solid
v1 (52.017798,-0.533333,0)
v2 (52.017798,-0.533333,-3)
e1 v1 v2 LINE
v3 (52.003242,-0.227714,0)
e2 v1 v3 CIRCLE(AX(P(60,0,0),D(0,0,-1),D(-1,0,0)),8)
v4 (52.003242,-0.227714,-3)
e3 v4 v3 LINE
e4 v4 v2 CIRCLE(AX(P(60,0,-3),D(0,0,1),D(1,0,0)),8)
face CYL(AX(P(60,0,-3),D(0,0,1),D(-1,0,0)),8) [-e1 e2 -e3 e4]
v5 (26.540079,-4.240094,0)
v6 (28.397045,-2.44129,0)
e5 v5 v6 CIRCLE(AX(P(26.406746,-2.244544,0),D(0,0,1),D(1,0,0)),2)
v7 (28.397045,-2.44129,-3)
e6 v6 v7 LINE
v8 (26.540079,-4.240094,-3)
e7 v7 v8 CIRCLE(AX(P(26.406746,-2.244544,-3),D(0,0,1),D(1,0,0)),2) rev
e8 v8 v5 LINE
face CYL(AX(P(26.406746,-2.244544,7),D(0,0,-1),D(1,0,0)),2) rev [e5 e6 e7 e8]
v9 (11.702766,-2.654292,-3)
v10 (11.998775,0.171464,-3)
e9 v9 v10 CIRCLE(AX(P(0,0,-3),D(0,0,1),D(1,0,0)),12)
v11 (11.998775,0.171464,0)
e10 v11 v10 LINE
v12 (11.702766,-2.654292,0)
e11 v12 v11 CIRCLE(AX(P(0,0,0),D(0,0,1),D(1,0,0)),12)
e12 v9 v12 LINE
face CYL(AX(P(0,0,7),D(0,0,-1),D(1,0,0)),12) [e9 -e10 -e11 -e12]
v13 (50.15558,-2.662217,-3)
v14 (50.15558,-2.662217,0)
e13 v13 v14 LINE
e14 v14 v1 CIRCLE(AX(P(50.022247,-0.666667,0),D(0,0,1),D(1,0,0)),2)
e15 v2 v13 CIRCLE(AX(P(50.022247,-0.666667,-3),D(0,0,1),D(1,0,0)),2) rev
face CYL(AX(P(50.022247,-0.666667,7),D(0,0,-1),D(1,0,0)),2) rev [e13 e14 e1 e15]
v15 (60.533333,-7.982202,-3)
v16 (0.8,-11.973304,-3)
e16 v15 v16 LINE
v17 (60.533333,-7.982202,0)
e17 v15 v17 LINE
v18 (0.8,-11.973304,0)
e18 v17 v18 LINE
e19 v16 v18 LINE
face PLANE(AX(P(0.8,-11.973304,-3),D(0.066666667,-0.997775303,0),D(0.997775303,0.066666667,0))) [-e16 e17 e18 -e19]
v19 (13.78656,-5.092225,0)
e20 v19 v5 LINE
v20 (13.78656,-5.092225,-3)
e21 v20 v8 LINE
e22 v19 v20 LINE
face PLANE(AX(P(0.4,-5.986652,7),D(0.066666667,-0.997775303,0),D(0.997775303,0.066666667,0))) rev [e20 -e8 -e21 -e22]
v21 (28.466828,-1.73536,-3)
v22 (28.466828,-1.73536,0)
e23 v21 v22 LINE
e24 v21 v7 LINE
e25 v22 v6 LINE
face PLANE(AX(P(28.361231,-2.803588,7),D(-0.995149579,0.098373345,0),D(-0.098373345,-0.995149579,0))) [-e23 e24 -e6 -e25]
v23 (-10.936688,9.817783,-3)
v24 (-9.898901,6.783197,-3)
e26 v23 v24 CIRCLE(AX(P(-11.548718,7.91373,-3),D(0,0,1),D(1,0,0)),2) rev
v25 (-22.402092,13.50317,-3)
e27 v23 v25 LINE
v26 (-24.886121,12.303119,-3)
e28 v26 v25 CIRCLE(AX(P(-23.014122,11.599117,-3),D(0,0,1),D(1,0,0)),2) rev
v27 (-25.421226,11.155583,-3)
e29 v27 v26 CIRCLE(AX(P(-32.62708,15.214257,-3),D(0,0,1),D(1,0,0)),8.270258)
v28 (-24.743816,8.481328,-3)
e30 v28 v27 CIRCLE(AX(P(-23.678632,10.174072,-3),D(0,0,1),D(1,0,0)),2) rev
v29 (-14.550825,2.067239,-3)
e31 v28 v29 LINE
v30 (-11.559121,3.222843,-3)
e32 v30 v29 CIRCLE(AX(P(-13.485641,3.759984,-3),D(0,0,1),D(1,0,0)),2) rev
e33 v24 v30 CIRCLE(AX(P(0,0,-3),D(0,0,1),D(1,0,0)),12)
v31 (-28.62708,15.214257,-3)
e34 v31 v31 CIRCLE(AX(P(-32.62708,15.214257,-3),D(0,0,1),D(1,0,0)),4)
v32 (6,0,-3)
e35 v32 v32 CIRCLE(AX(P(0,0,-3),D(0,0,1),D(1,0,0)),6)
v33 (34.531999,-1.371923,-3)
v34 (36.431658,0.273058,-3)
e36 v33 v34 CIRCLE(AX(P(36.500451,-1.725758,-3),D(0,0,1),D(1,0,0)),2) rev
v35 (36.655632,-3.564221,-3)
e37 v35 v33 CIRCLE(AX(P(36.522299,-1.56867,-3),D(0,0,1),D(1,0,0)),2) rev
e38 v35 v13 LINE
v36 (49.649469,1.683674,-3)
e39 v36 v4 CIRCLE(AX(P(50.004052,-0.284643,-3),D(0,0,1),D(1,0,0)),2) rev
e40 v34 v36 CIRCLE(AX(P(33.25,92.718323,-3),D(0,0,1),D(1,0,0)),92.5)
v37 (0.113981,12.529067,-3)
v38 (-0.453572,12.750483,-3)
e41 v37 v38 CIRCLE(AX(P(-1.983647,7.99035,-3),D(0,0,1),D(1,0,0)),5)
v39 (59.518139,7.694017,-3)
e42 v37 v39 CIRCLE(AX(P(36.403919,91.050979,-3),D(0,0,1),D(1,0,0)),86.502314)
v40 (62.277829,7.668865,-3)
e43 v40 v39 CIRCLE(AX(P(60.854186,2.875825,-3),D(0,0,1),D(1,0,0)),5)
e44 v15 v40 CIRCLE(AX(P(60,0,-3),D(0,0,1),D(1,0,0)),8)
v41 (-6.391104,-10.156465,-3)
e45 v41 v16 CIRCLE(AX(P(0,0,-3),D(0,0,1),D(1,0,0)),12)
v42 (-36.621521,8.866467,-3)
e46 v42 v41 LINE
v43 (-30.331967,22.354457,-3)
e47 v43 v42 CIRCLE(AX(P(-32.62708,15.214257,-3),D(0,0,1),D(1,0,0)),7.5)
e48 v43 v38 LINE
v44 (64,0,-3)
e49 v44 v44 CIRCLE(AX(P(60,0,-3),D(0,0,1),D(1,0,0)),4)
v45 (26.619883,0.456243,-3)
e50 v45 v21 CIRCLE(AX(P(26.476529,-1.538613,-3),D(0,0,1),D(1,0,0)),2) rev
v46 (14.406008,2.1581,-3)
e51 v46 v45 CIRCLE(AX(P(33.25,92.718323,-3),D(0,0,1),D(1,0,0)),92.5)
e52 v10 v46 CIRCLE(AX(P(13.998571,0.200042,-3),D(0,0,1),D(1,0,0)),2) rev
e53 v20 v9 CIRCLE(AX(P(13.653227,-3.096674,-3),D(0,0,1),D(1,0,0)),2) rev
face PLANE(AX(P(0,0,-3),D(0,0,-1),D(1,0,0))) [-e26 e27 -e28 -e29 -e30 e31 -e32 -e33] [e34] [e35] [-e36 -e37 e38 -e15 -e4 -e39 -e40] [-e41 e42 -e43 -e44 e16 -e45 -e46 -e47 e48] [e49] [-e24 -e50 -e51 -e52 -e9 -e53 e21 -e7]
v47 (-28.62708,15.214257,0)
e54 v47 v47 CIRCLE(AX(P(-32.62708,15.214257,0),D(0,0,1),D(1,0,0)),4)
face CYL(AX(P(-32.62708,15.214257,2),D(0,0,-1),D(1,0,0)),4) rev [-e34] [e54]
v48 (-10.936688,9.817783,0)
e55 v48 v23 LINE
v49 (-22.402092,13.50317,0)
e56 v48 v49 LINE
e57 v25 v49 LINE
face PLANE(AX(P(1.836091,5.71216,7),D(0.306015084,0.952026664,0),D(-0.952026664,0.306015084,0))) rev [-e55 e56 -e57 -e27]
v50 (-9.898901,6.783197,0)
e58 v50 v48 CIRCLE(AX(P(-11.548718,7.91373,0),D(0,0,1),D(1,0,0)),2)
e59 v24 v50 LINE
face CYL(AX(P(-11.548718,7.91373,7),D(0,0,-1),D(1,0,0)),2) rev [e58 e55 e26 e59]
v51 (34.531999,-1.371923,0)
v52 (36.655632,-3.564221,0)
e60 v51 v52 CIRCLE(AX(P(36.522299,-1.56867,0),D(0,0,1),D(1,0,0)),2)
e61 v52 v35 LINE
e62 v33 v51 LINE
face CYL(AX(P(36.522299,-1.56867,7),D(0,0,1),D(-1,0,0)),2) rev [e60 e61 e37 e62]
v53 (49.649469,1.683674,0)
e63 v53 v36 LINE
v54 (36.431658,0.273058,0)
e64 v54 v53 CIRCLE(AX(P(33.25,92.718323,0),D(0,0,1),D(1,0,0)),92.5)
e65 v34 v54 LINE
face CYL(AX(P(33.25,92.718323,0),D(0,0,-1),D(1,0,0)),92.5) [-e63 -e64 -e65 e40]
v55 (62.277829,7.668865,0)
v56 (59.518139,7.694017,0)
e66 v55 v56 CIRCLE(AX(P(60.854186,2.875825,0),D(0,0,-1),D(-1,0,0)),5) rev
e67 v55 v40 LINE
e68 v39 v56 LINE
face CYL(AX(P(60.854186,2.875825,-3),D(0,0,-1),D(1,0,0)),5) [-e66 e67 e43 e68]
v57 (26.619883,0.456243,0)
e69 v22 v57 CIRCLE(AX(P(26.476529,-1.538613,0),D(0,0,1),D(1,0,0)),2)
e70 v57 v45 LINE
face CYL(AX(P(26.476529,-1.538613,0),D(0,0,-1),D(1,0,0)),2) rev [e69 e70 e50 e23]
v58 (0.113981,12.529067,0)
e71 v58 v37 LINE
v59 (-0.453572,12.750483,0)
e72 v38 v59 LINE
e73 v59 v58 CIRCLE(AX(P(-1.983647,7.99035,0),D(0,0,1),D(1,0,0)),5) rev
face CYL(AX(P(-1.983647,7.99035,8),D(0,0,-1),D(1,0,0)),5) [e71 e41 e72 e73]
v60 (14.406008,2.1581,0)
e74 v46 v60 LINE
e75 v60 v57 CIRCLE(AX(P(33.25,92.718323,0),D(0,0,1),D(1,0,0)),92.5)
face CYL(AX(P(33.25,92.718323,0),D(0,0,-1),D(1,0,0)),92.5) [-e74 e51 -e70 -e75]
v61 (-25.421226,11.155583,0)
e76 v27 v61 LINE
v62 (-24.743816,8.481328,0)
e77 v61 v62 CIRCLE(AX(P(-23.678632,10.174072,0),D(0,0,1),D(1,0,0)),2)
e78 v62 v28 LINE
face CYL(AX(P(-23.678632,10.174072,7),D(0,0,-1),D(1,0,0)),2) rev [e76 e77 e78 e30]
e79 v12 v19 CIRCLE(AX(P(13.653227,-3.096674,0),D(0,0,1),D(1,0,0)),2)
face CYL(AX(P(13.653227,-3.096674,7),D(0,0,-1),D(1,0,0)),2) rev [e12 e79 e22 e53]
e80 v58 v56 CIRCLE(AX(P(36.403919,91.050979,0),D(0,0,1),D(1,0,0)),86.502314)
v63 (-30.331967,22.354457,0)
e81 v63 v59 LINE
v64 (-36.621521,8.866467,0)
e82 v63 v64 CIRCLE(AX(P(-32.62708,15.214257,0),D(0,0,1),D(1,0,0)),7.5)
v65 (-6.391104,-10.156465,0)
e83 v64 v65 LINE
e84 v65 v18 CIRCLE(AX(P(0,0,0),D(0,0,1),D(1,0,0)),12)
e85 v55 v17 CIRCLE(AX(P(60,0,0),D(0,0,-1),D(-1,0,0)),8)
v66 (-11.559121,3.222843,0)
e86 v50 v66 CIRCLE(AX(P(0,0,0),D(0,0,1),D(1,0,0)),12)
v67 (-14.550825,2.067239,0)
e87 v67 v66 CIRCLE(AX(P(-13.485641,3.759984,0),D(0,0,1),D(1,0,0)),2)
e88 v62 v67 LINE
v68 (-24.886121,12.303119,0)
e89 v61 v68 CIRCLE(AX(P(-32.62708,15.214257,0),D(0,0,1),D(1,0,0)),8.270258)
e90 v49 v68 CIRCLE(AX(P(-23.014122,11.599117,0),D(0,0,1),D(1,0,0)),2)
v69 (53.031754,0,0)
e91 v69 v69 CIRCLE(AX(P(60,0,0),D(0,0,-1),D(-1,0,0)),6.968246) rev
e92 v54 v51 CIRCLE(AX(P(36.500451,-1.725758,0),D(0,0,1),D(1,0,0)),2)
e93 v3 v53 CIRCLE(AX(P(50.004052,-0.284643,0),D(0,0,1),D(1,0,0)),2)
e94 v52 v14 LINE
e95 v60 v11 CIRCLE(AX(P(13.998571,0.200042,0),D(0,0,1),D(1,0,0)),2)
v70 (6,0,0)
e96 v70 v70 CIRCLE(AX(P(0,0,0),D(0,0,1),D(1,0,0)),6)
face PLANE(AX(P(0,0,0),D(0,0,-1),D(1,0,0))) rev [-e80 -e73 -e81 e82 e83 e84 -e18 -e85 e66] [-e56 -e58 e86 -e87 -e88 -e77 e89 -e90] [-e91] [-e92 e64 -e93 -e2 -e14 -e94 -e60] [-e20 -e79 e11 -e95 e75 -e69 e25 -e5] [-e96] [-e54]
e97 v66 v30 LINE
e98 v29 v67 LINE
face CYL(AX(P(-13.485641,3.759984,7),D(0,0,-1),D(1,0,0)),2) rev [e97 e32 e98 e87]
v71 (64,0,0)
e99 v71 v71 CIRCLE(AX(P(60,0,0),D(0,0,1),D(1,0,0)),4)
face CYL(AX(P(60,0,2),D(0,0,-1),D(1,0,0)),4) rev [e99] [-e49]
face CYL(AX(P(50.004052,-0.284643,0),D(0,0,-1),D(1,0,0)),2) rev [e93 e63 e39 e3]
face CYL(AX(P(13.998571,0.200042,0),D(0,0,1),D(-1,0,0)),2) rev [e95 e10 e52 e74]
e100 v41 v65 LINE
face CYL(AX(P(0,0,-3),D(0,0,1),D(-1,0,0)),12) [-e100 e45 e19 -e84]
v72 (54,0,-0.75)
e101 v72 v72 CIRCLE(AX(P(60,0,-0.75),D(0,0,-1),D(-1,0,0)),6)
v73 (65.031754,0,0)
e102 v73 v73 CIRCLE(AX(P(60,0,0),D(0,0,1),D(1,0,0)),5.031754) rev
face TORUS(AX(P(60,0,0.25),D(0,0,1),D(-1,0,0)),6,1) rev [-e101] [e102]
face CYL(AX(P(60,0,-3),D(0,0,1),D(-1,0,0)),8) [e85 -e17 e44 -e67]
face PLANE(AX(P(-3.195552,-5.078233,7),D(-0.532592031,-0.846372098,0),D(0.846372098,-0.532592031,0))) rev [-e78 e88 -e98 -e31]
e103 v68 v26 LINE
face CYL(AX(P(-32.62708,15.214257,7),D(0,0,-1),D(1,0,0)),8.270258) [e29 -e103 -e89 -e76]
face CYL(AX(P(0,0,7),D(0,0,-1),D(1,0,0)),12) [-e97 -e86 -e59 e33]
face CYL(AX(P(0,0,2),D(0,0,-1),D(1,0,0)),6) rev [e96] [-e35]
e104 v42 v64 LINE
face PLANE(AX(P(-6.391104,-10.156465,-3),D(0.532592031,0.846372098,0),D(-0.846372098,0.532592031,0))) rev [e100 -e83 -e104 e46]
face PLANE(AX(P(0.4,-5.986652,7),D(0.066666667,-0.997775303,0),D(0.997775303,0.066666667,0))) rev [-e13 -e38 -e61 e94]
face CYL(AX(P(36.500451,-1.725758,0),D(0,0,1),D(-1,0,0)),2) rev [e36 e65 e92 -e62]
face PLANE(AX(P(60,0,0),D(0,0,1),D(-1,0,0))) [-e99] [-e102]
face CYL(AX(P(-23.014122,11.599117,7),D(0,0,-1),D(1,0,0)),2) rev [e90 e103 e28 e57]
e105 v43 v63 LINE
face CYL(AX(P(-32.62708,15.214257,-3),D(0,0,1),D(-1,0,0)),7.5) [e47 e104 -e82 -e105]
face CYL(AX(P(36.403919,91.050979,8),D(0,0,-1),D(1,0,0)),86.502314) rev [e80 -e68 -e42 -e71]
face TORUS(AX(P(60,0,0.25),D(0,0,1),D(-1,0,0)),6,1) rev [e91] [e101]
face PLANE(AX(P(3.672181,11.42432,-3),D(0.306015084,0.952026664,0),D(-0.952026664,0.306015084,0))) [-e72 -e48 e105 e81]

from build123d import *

# Parameters (mm, degrees)
EXTRUDE_1_DEPTH     = 3
SKETCH_2_R          = 4
SKETCH_2_R_2        = 6
CUT_EXTRUDE_1_DEPTH = 5
CUT_EXTRUDE_START   = -10
CUT_EXTRUDE_2_DEPTH = 10
FILLET_1_R          = 2
EXTRUDE_START       = -3
EXTRUDE_2_DEPTH     = 3
FILLET_3_R          = 2
EXTRUDE_START_2     = 0.25
SKETCH_6_R          = 8
EXTRUDE_3_DEPTH     = 0.25
SKETCH_7_R          = 7
SKETCH_7_R_2        = 5
CUT_EXTRUDE_4_DEPTH = 1
SKETCH_4_R          = 86.502313977
CUT_EXTRUDE_5_DEPTH = 11
FILLET_5_R          = 5
FILLET_6_R          = 1
SKETCH_8_R          = 14.07038583
CUT_EXTRUDE_6_DEPTH = 0.25


# Some blends are built 0.0001 mm under size
with BuildPart() as part:
    # 草图1 → 凸台-拉伸1 (new body)
    with BuildSketch(Plane.XY):
        with BuildLine():
            Line((60.533333333, -7.982202425), (0.8, -11.973303638))
            ThreePointArc((0.8, -11.973303638), (-2.939445104, -11.634417153), (-6.391104371, -10.156465178))
            Line((-6.391104371, -10.156465178), (-36.621520565, 8.866466686))
            ThreePointArc((-36.621520565, 8.866466686), (-39.424388736, 18.383894386), (-30.331967202, 22.3544574))
            Line((-30.331967202, 22.3544574), (-0.067539503, 12.626398572))
            ThreePointArc((-0.067539503, 12.626398572), (2.297970236, 12.022555106), (4.719428847, 11.711425782))
            Line((4.719428847, 11.711425782), (60.533333333, 7.982202425))
            ThreePointArc((60.533333333, 7.982202425), (68, 0), (60.533333333, -7.982202425))
        make_face()
    extrude(amount=EXTRUDE_1_DEPTH)

    # 草图2 → 切除-拉伸1 (cut)
    with BuildSketch(Plane.XY.offset(3)):
        with Locations((-32.627080333, 15.214257423)):
            Circle(SKETCH_2_R)
        with Locations((60, 0)):
            Circle(SKETCH_2_R)
        Circle(SKETCH_2_R_2)
    extrude(amount=-CUT_EXTRUDE_1_DEPTH, mode=Mode.SUBTRACT)

    # 草图3 → 切除-拉伸2 (cut)
    with BuildSketch(Plane.XY.offset(3).offset(CUT_EXTRUDE_START)):
        with BuildLine():
            Line((28.230392562, -4.127155499), (29.041000535, 4.072994476))
            Line((29.041000535, 4.072994476), (10.769185117, 5.293831496))
            ThreePointArc((10.769185117, 5.293831496), (11.688246691, 2.71751528), (12, 0))
            ThreePointArc((12, 0), (11.688246691, -2.71751528), (10.769185117, -5.293831496))
            Line((10.769185117, -5.293831496), (28.230392562, -4.127155499))
        make_face()
        with BuildLine():
            ThreePointArc((-11.991309043, 0.456626154), (-10.875693444, 5.071419141), (-8.057660805, 8.892362024))
            Line((-8.057660805, 8.892362024), (-24.425138032, 14.153448832))
            ThreePointArc((-24.425138032, 14.153448832), (-25.131680833, 11.719095235), (-26.54234692, 9.613079718))
            Line((-26.54234692, 9.613079718), (-11.991309043, 0.456626154))
        make_face()
        with BuildLine():
            Line((52.404599069, 2.511948386), (35.030683756, 3.672791932))
            Line((35.030683756, 3.672791932), (34.299724154, -3.721631224))
            Line((34.299724154, -3.721631224), (52.404599069, -2.511948386))
            ThreePointArc((52.404599069, -2.511948386), (52, 0), (52.404599069, 2.511948386))
        make_face()
    extrude(amount=CUT_EXTRUDE_2_DEPTH, mode=Mode.SUBTRACT)

    # 圆角1
    fillet_1_edges = [part.edges().sort_by_distance(p)[0] for p in [
        (52.404599069, 2.511948386, 1.5),
        (52.404599069, -2.511948386, 1.5),
        (34.299724154, -3.721631224, 1.5),
        (35.030683756, 3.672791932, 1.5),
        (-26.54234692, 9.613079718, 1.5),
        (-24.425138032, 14.153448832, 1.5),
        (-8.057660805, 8.892362024, 1.5),
        (-11.991309043, 0.456626154, 1.5),
        (10.769185117, -5.293831496, 1.5),
        (10.769185117, 5.293831496, 1.5),
        (29.041000535, 4.072994476, 1.5),
        (28.230392562, -4.127155499, 1.5),
    ]]
    fillet(fillet_1_edges, radius=FILLET_1_R)

    # 草图5 → 凸台-拉伸2 (add)
    with BuildSketch(Plane.XY.offset(3).offset(EXTRUDE_START)):
        with BuildLine():
            Line((-24.540394024, 20.492840682), (-0.067539503, 12.626398572))
            ThreePointArc((-0.067539503, 12.626398572), (29.515306686, 4.823317954), (59.944614351, 7.999808275))
            ThreePointArc((59.944614351, 7.999808275), (62.829825639, 7.482786036), (65.335143615, 5.96122828))
            ThreePointArc((65.335143615, 5.96122828), (18.485789408, 1.404205763), (-24.540394024, 20.492840682))
        make_face()
    extrude(amount=EXTRUDE_2_DEPTH)

    # 圆角3
    # the kernel refuses this fillet: 2 mm, written as the material it adds along each edge
    with BuildSketch(Plane(origin=(51.482720464, 2.033055033, 0), x_dir=(-0.982319810641478, -0.18721054890494518, 0), z_dir=(0, 0, 1))) as fillet_3_piece_1:
        with BuildLine():
            CenterArc((1.886422925, 1.999898233), FILLET_3_R, 170.841064361, 98.580936146)
            Line((-0.088078274, 2.318245549), (-0.285528394, 2.350080281))
            ThreePointArc((-0.285528394, 2.350080281), (-0.438383872, 1.623834826), (-0.169045436, -0.106881432))
            Line((-0.169045436, -0.106881432), (0.002017565, -0.199989823))
            ThreePointArc((0.002017565, -0.199989823), (0.933123639, -0.195293287), (1.864229714, -0.199989823))
            Line((1.864229714, -0.199989823), (1.866247279, 0))
        make_face()
    extrude(amount=3)
    with BuildSketch(Plane(origin=(34.690308342, 0.229537561, 3), x_dir=(-0.09837334507512366, -0.995149579198389, 0), z_dir=(0, 0, -1))) as fillet_3_piece_2:
        with BuildLine():
            CenterArc((1.767742063, -1.99371148), FILLET_3_R, 94.544757631, 77.838582335)
            Line((-0.214612021, -1.728622274), (-0.254259103, -1.72332049))
            ThreePointArc((-0.254259103, -1.72332049), (-0.142932142, -0.859888079), (-0.039739887, 0.004554272))
            Line((-0.039739887, 0.004554272), (0, 0.04))
            ThreePointArc((0, 0.04), (0.8046332, 0.04), (1.606096886, 0.03987423))
            Line((1.606096886, 0.03987423), (1.6092664, 0))
        make_face()
    extrude(amount=3)
    with BuildSketch(Plane(origin=(28.671165111, 0.331721205, 3), x_dir=(-0.9981625762582289, 0.060592667522857975, 0), z_dir=(0, 0, -1))) as fillet_3_piece_3:
        with BuildLine():
            CenterArc((2.077274931, -1.999876599), FILLET_3_R, 90.636478793, 91.535197335)
            Line((0.078711388, -2.075664247), (0.038740118, -2.07718))
            Line((0.038740118, -2.07718), (-0.039971271, -0.001515753))
            Line((-0.039971271, -0.001515753), (0.000444337, 0.039997532))
            ThreePointArc((0.000444337, 0.039997532), (1.027529043, 0.034292711), (2.05461375, 0.039997532))
            Line((2.05461375, 0.039997532), (2.055058086, 0))
        make_face()
    extrude(amount=3)
    with BuildSketch(Plane(origin=(11.680363127, 2.768333075, 0), x_dir=(0.12170231269855974, -0.9925666461673099, 0), z_dir=(0, 0, 1))) as fillet_3_piece_4:
        with BuildLine():
            CenterArc((2.831331682, 1.988408565), FILLET_3_R, 161.255131194, 102.573219996)
            Line((0.937413857, 2.631117886), (0.748022074, 2.695388818))
            ThreePointArc((0.748022074, 2.695388818), (0.290238781, 1.379143519), (-0.187364942, 0.069959836))
            Line((-0.187364942, 0.069959836), (0.008579816, -0.199815882))
            ThreePointArc((0.008579816, -0.199815882), (0.136091641, -0.190622784), (2.594815369, -0.198840857))
            Line((2.594815369, -0.198840857), (2.616316852, 0))
        make_face()
    extrude(amount=3)

    # 草图6 → 凸台-拉伸3 (add)
    with BuildSketch(Plane(origin=(0, 0, 0), x_dir=(-1, 0, 0), z_dir=(0, 0, -1)).offset(EXTRUDE_START_2)):
        with Locations((-60, 0)):
            Circle(SKETCH_6_R)
    extrude(amount=-EXTRUDE_3_DEPTH)

    # 草图7 → 切除-拉伸4 (cut)
    with BuildSketch(Plane(origin=(0, 0, -0.25), x_dir=(-1, 0, 0), z_dir=(0, 0, -1))):
        with Locations((-60, 0)):
            Circle(SKETCH_7_R)
        with Locations((-60, 0)):
            Circle(SKETCH_7_R_2, mode=Mode.SUBTRACT)
    extrude(amount=-CUT_EXTRUDE_4_DEPTH, mode=Mode.SUBTRACT)

    # 草图4 → 切除-拉伸5 (cut)
    with BuildSketch(Plane.XY.offset(3)):
        with Locations((36.403919295, 91.050979361)):
            Circle(SKETCH_4_R)
    extrude(amount=-CUT_EXTRUDE_5_DEPTH, mode=Mode.SUBTRACT)

    # 圆角5
    fillet_5_edges = [part.edges().sort_by_distance(p)[0] for p in [
        (60.533333333, 7.982202425, 1.375),
        (-0.158941589, 12.65577844, 1.5),
    ]]
    fillet(fillet_5_edges, radius=FILLET_5_R)

    # 圆角6
    fillet_6_edges = [part.edges().sort_by_distance(p)[0] for p in [
        (67, 0, 0.75),
        (65, 0, 0.75),
    ]]
    fillet(fillet_6_edges, radius=FILLET_6_R - 0.0001)  # a hair under: the kernel refuses the full size

    # 草图8 → 切除-拉伸6 (cut)
    with BuildSketch(Plane(origin=(0, 0, -0.25), x_dir=(-1, 0, 0), z_dir=(0, 0, -1))):
        with Locations((-60, 0)):
            Circle(SKETCH_8_R)
    extrude(amount=-CUT_EXTRUDE_6_DEPTH, mode=Mode.SUBTRACT)


with BuildPart() as body_2:
    # 镜向1: mirrored copy
    add(part.part.mirror(Plane.XY))


solid = body_2.part
